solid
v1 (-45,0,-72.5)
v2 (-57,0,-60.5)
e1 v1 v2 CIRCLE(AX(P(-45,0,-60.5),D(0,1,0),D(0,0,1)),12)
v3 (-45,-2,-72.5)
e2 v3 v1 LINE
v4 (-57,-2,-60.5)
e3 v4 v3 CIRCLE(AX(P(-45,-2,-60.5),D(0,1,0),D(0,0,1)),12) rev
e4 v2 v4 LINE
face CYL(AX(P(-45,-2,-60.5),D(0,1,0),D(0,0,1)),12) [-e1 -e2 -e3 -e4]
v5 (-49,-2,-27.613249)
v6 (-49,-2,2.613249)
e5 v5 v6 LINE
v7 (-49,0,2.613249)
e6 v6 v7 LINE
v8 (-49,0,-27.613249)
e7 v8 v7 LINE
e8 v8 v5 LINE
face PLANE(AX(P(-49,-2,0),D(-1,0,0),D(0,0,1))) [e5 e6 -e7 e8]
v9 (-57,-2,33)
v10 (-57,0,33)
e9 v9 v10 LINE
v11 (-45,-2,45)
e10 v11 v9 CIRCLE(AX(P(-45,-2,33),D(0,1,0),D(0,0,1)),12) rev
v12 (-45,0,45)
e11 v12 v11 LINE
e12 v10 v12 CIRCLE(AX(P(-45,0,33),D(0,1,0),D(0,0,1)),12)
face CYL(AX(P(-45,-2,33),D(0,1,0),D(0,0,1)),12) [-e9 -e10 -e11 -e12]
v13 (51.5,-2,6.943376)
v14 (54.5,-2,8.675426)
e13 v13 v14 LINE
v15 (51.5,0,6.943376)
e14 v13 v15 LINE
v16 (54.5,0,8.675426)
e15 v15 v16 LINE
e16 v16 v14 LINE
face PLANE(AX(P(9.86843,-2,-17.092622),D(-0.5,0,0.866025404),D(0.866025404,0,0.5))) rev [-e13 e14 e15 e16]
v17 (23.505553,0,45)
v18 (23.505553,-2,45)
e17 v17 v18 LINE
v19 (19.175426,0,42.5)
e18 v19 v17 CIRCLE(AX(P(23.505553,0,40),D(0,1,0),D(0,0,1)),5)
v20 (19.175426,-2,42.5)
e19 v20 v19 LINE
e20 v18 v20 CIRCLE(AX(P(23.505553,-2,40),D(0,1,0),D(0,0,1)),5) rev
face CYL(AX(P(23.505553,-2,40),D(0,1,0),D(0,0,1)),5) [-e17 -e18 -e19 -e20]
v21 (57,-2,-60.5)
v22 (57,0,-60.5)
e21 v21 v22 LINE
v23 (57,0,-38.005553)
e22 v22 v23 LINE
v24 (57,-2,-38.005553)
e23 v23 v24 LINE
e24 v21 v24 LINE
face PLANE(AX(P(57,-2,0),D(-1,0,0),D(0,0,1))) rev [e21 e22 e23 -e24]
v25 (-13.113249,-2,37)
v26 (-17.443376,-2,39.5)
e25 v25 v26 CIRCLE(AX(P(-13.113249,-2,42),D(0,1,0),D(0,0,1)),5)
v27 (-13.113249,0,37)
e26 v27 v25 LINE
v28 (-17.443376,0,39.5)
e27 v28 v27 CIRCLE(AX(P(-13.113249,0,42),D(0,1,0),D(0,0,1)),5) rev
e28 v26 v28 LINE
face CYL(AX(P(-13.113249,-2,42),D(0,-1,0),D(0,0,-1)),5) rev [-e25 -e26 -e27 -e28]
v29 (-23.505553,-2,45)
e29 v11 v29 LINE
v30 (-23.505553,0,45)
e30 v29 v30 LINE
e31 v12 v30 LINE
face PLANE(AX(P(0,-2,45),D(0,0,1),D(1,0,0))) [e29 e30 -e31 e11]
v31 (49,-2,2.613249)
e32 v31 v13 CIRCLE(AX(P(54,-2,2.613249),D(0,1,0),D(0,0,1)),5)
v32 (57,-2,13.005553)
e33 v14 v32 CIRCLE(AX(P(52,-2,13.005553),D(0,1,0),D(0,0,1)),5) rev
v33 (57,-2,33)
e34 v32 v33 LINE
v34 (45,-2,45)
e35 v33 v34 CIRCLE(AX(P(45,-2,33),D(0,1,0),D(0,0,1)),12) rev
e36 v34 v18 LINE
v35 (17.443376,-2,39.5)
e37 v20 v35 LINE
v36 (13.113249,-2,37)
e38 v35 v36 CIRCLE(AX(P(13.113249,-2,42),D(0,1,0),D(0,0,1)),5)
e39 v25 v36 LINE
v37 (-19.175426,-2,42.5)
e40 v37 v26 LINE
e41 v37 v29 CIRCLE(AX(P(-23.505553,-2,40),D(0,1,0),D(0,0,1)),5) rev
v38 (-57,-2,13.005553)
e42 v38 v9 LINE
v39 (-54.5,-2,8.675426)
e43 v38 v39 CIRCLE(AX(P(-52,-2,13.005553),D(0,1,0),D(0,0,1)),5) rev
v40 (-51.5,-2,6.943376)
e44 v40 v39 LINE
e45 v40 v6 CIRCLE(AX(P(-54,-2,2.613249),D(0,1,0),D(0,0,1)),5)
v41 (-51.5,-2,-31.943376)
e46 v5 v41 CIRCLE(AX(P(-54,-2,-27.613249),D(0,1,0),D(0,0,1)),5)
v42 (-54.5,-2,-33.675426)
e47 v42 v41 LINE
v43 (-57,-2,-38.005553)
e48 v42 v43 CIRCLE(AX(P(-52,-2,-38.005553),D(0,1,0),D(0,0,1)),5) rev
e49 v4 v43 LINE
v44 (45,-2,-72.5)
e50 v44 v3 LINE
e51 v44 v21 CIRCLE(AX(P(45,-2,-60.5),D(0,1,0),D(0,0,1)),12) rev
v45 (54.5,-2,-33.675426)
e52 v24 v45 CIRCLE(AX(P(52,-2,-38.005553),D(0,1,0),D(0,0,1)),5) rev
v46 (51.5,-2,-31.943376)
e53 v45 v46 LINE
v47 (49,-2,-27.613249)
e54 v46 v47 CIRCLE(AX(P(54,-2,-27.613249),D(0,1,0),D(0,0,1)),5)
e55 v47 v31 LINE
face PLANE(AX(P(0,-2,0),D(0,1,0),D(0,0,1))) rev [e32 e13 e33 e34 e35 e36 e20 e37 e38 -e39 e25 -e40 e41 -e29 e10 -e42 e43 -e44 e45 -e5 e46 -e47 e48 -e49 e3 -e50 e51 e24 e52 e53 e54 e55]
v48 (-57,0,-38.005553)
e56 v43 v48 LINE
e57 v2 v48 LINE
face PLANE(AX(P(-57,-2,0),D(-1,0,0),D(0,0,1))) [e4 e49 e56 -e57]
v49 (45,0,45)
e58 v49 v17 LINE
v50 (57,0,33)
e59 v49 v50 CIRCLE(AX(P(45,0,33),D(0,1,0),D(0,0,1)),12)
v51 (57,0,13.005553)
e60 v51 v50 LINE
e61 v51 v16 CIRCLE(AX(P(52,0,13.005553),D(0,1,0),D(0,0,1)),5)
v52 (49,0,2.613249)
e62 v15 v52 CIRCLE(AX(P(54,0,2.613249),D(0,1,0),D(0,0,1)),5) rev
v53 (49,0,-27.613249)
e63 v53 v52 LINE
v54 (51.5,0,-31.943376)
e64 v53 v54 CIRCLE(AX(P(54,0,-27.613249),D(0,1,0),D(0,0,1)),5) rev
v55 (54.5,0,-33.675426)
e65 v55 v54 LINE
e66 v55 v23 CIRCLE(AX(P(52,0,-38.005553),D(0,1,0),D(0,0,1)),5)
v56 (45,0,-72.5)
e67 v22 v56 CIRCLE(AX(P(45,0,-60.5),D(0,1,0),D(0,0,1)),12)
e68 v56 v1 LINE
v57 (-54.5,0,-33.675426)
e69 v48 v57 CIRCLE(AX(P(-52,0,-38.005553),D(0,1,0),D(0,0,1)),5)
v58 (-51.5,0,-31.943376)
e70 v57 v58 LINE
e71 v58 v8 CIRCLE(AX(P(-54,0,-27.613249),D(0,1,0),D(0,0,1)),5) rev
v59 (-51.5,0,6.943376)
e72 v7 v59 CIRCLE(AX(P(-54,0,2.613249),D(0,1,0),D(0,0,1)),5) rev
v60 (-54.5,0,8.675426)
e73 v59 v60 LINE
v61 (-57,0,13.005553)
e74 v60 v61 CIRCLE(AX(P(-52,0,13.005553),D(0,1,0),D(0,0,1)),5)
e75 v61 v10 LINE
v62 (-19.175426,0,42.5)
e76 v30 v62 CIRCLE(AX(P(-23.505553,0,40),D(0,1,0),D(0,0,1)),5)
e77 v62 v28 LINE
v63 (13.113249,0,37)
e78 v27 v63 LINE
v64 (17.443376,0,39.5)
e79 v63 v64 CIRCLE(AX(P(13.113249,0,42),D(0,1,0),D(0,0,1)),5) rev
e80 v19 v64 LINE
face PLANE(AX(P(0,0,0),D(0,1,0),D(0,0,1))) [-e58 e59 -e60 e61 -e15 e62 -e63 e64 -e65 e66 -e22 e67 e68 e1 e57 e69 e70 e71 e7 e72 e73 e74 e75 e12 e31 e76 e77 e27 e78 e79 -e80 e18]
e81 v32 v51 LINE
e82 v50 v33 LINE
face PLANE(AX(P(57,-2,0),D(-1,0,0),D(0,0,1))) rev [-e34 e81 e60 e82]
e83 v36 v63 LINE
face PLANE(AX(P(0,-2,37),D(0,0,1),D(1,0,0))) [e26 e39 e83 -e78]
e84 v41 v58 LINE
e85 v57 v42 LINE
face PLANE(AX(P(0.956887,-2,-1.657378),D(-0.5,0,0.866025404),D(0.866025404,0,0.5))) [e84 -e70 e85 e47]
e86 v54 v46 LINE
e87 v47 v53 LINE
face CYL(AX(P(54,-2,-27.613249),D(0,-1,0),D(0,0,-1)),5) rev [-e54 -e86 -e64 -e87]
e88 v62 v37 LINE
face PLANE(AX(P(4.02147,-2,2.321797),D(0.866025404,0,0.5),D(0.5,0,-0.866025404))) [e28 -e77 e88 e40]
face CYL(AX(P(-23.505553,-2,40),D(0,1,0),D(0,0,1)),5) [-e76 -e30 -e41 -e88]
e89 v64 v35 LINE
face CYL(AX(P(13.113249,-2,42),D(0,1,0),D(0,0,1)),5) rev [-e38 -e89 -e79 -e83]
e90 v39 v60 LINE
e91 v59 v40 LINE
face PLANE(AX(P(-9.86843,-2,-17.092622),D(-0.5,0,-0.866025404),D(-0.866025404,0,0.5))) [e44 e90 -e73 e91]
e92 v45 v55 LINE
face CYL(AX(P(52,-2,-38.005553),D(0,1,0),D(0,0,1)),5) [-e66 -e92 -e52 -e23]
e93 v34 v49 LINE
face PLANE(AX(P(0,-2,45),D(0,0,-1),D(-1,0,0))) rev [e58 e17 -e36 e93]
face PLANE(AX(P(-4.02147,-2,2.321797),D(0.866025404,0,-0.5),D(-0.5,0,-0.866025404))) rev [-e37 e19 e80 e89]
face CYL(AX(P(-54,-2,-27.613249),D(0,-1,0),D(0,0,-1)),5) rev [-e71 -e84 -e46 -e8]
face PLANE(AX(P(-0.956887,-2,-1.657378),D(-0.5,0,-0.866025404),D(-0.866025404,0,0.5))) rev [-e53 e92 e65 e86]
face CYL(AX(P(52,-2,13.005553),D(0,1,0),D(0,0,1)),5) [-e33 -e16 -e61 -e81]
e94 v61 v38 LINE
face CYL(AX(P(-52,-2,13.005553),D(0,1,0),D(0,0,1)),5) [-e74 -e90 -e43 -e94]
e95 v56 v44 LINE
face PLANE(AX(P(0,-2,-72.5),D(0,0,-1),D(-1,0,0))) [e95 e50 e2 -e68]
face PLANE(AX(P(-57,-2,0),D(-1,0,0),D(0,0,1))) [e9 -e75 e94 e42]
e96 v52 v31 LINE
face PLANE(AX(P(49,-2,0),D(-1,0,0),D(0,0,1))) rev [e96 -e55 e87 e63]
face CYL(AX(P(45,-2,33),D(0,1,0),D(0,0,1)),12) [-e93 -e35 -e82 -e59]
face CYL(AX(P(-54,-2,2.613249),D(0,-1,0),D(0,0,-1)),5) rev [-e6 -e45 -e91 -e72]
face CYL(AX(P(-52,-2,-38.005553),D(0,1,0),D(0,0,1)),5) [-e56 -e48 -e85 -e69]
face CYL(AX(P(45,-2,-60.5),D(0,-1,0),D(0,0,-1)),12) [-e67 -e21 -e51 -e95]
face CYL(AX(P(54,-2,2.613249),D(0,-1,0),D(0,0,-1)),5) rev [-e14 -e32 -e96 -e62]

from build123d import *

# Parameters (mm, degrees)
BOSS_EXTRUDE1_START = -2
BOSS_EXTRUDE1_DEPTH = 2
FILLET1_R           = 12
FILLET2_R           = 5
FILLET3_R           = 5


with BuildPart() as part:
    # Boss-Extrude1: read off the stored shape, not the designer's step
    # Boss-Extrude1 outline → Boss-Extrude1 (new body)
    with BuildSketch(Plane(origin=(0, 0, 0), x_dir=(1, 0, 0), z_dir=(0, 1, 0)).offset(BOSS_EXTRUDE1_START)):
        Polygon((57, 35.118802154), (57, 72.5), (-57, 72.5), (-57, 35.118802154), (-49, 30.5), (-49, -5.5), (-57, -10.118802154), (-57, -45), (-20.618802154, -45), (-16, -37), (16, -37), (20.618802154, -45), (57, -45), (57, -10.118802154), (49, -5.5), (49, 30.5), align=None)
    extrude(amount=BOSS_EXTRUDE1_DEPTH)

    # Fillet1
    fillet1_edges = [part.edges().sort_by_distance(p)[0] for p in [
        (57, -1, 45),
        (-57, -1, 45),
        (-57, -1, -72.5),
        (57, -1, -72.5),
    ]]
    fillet(fillet1_edges, radius=FILLET1_R)

    # Fillet2
    fillet2_edges = [part.edges().sort_by_distance(p)[0] for p in [
        (57, -1, -35.118802154),
        (57, -1, 10.118802154),
        (20.618802154, -1, 45),
        (-20.618802154, -1, 45),
        (-57, -1, 10.118802154),
        (-57, -1, -35.118802154),
    ]]
    fillet(fillet2_edges, radius=FILLET2_R)

    # Fillet3
    fillet3_edges = [part.edges().sort_by_distance(p)[0] for p in [
        (49, -1, -30.5),
        (49, -1, 5.5),
        (16, -1, 37),
        (-16, -1, 37),
        (-49, -1, 5.5),
        (-49, -1, -30.5),
    ]]
    fillet(fillet3_edges, radius=FILLET3_R)


solid = part.part
